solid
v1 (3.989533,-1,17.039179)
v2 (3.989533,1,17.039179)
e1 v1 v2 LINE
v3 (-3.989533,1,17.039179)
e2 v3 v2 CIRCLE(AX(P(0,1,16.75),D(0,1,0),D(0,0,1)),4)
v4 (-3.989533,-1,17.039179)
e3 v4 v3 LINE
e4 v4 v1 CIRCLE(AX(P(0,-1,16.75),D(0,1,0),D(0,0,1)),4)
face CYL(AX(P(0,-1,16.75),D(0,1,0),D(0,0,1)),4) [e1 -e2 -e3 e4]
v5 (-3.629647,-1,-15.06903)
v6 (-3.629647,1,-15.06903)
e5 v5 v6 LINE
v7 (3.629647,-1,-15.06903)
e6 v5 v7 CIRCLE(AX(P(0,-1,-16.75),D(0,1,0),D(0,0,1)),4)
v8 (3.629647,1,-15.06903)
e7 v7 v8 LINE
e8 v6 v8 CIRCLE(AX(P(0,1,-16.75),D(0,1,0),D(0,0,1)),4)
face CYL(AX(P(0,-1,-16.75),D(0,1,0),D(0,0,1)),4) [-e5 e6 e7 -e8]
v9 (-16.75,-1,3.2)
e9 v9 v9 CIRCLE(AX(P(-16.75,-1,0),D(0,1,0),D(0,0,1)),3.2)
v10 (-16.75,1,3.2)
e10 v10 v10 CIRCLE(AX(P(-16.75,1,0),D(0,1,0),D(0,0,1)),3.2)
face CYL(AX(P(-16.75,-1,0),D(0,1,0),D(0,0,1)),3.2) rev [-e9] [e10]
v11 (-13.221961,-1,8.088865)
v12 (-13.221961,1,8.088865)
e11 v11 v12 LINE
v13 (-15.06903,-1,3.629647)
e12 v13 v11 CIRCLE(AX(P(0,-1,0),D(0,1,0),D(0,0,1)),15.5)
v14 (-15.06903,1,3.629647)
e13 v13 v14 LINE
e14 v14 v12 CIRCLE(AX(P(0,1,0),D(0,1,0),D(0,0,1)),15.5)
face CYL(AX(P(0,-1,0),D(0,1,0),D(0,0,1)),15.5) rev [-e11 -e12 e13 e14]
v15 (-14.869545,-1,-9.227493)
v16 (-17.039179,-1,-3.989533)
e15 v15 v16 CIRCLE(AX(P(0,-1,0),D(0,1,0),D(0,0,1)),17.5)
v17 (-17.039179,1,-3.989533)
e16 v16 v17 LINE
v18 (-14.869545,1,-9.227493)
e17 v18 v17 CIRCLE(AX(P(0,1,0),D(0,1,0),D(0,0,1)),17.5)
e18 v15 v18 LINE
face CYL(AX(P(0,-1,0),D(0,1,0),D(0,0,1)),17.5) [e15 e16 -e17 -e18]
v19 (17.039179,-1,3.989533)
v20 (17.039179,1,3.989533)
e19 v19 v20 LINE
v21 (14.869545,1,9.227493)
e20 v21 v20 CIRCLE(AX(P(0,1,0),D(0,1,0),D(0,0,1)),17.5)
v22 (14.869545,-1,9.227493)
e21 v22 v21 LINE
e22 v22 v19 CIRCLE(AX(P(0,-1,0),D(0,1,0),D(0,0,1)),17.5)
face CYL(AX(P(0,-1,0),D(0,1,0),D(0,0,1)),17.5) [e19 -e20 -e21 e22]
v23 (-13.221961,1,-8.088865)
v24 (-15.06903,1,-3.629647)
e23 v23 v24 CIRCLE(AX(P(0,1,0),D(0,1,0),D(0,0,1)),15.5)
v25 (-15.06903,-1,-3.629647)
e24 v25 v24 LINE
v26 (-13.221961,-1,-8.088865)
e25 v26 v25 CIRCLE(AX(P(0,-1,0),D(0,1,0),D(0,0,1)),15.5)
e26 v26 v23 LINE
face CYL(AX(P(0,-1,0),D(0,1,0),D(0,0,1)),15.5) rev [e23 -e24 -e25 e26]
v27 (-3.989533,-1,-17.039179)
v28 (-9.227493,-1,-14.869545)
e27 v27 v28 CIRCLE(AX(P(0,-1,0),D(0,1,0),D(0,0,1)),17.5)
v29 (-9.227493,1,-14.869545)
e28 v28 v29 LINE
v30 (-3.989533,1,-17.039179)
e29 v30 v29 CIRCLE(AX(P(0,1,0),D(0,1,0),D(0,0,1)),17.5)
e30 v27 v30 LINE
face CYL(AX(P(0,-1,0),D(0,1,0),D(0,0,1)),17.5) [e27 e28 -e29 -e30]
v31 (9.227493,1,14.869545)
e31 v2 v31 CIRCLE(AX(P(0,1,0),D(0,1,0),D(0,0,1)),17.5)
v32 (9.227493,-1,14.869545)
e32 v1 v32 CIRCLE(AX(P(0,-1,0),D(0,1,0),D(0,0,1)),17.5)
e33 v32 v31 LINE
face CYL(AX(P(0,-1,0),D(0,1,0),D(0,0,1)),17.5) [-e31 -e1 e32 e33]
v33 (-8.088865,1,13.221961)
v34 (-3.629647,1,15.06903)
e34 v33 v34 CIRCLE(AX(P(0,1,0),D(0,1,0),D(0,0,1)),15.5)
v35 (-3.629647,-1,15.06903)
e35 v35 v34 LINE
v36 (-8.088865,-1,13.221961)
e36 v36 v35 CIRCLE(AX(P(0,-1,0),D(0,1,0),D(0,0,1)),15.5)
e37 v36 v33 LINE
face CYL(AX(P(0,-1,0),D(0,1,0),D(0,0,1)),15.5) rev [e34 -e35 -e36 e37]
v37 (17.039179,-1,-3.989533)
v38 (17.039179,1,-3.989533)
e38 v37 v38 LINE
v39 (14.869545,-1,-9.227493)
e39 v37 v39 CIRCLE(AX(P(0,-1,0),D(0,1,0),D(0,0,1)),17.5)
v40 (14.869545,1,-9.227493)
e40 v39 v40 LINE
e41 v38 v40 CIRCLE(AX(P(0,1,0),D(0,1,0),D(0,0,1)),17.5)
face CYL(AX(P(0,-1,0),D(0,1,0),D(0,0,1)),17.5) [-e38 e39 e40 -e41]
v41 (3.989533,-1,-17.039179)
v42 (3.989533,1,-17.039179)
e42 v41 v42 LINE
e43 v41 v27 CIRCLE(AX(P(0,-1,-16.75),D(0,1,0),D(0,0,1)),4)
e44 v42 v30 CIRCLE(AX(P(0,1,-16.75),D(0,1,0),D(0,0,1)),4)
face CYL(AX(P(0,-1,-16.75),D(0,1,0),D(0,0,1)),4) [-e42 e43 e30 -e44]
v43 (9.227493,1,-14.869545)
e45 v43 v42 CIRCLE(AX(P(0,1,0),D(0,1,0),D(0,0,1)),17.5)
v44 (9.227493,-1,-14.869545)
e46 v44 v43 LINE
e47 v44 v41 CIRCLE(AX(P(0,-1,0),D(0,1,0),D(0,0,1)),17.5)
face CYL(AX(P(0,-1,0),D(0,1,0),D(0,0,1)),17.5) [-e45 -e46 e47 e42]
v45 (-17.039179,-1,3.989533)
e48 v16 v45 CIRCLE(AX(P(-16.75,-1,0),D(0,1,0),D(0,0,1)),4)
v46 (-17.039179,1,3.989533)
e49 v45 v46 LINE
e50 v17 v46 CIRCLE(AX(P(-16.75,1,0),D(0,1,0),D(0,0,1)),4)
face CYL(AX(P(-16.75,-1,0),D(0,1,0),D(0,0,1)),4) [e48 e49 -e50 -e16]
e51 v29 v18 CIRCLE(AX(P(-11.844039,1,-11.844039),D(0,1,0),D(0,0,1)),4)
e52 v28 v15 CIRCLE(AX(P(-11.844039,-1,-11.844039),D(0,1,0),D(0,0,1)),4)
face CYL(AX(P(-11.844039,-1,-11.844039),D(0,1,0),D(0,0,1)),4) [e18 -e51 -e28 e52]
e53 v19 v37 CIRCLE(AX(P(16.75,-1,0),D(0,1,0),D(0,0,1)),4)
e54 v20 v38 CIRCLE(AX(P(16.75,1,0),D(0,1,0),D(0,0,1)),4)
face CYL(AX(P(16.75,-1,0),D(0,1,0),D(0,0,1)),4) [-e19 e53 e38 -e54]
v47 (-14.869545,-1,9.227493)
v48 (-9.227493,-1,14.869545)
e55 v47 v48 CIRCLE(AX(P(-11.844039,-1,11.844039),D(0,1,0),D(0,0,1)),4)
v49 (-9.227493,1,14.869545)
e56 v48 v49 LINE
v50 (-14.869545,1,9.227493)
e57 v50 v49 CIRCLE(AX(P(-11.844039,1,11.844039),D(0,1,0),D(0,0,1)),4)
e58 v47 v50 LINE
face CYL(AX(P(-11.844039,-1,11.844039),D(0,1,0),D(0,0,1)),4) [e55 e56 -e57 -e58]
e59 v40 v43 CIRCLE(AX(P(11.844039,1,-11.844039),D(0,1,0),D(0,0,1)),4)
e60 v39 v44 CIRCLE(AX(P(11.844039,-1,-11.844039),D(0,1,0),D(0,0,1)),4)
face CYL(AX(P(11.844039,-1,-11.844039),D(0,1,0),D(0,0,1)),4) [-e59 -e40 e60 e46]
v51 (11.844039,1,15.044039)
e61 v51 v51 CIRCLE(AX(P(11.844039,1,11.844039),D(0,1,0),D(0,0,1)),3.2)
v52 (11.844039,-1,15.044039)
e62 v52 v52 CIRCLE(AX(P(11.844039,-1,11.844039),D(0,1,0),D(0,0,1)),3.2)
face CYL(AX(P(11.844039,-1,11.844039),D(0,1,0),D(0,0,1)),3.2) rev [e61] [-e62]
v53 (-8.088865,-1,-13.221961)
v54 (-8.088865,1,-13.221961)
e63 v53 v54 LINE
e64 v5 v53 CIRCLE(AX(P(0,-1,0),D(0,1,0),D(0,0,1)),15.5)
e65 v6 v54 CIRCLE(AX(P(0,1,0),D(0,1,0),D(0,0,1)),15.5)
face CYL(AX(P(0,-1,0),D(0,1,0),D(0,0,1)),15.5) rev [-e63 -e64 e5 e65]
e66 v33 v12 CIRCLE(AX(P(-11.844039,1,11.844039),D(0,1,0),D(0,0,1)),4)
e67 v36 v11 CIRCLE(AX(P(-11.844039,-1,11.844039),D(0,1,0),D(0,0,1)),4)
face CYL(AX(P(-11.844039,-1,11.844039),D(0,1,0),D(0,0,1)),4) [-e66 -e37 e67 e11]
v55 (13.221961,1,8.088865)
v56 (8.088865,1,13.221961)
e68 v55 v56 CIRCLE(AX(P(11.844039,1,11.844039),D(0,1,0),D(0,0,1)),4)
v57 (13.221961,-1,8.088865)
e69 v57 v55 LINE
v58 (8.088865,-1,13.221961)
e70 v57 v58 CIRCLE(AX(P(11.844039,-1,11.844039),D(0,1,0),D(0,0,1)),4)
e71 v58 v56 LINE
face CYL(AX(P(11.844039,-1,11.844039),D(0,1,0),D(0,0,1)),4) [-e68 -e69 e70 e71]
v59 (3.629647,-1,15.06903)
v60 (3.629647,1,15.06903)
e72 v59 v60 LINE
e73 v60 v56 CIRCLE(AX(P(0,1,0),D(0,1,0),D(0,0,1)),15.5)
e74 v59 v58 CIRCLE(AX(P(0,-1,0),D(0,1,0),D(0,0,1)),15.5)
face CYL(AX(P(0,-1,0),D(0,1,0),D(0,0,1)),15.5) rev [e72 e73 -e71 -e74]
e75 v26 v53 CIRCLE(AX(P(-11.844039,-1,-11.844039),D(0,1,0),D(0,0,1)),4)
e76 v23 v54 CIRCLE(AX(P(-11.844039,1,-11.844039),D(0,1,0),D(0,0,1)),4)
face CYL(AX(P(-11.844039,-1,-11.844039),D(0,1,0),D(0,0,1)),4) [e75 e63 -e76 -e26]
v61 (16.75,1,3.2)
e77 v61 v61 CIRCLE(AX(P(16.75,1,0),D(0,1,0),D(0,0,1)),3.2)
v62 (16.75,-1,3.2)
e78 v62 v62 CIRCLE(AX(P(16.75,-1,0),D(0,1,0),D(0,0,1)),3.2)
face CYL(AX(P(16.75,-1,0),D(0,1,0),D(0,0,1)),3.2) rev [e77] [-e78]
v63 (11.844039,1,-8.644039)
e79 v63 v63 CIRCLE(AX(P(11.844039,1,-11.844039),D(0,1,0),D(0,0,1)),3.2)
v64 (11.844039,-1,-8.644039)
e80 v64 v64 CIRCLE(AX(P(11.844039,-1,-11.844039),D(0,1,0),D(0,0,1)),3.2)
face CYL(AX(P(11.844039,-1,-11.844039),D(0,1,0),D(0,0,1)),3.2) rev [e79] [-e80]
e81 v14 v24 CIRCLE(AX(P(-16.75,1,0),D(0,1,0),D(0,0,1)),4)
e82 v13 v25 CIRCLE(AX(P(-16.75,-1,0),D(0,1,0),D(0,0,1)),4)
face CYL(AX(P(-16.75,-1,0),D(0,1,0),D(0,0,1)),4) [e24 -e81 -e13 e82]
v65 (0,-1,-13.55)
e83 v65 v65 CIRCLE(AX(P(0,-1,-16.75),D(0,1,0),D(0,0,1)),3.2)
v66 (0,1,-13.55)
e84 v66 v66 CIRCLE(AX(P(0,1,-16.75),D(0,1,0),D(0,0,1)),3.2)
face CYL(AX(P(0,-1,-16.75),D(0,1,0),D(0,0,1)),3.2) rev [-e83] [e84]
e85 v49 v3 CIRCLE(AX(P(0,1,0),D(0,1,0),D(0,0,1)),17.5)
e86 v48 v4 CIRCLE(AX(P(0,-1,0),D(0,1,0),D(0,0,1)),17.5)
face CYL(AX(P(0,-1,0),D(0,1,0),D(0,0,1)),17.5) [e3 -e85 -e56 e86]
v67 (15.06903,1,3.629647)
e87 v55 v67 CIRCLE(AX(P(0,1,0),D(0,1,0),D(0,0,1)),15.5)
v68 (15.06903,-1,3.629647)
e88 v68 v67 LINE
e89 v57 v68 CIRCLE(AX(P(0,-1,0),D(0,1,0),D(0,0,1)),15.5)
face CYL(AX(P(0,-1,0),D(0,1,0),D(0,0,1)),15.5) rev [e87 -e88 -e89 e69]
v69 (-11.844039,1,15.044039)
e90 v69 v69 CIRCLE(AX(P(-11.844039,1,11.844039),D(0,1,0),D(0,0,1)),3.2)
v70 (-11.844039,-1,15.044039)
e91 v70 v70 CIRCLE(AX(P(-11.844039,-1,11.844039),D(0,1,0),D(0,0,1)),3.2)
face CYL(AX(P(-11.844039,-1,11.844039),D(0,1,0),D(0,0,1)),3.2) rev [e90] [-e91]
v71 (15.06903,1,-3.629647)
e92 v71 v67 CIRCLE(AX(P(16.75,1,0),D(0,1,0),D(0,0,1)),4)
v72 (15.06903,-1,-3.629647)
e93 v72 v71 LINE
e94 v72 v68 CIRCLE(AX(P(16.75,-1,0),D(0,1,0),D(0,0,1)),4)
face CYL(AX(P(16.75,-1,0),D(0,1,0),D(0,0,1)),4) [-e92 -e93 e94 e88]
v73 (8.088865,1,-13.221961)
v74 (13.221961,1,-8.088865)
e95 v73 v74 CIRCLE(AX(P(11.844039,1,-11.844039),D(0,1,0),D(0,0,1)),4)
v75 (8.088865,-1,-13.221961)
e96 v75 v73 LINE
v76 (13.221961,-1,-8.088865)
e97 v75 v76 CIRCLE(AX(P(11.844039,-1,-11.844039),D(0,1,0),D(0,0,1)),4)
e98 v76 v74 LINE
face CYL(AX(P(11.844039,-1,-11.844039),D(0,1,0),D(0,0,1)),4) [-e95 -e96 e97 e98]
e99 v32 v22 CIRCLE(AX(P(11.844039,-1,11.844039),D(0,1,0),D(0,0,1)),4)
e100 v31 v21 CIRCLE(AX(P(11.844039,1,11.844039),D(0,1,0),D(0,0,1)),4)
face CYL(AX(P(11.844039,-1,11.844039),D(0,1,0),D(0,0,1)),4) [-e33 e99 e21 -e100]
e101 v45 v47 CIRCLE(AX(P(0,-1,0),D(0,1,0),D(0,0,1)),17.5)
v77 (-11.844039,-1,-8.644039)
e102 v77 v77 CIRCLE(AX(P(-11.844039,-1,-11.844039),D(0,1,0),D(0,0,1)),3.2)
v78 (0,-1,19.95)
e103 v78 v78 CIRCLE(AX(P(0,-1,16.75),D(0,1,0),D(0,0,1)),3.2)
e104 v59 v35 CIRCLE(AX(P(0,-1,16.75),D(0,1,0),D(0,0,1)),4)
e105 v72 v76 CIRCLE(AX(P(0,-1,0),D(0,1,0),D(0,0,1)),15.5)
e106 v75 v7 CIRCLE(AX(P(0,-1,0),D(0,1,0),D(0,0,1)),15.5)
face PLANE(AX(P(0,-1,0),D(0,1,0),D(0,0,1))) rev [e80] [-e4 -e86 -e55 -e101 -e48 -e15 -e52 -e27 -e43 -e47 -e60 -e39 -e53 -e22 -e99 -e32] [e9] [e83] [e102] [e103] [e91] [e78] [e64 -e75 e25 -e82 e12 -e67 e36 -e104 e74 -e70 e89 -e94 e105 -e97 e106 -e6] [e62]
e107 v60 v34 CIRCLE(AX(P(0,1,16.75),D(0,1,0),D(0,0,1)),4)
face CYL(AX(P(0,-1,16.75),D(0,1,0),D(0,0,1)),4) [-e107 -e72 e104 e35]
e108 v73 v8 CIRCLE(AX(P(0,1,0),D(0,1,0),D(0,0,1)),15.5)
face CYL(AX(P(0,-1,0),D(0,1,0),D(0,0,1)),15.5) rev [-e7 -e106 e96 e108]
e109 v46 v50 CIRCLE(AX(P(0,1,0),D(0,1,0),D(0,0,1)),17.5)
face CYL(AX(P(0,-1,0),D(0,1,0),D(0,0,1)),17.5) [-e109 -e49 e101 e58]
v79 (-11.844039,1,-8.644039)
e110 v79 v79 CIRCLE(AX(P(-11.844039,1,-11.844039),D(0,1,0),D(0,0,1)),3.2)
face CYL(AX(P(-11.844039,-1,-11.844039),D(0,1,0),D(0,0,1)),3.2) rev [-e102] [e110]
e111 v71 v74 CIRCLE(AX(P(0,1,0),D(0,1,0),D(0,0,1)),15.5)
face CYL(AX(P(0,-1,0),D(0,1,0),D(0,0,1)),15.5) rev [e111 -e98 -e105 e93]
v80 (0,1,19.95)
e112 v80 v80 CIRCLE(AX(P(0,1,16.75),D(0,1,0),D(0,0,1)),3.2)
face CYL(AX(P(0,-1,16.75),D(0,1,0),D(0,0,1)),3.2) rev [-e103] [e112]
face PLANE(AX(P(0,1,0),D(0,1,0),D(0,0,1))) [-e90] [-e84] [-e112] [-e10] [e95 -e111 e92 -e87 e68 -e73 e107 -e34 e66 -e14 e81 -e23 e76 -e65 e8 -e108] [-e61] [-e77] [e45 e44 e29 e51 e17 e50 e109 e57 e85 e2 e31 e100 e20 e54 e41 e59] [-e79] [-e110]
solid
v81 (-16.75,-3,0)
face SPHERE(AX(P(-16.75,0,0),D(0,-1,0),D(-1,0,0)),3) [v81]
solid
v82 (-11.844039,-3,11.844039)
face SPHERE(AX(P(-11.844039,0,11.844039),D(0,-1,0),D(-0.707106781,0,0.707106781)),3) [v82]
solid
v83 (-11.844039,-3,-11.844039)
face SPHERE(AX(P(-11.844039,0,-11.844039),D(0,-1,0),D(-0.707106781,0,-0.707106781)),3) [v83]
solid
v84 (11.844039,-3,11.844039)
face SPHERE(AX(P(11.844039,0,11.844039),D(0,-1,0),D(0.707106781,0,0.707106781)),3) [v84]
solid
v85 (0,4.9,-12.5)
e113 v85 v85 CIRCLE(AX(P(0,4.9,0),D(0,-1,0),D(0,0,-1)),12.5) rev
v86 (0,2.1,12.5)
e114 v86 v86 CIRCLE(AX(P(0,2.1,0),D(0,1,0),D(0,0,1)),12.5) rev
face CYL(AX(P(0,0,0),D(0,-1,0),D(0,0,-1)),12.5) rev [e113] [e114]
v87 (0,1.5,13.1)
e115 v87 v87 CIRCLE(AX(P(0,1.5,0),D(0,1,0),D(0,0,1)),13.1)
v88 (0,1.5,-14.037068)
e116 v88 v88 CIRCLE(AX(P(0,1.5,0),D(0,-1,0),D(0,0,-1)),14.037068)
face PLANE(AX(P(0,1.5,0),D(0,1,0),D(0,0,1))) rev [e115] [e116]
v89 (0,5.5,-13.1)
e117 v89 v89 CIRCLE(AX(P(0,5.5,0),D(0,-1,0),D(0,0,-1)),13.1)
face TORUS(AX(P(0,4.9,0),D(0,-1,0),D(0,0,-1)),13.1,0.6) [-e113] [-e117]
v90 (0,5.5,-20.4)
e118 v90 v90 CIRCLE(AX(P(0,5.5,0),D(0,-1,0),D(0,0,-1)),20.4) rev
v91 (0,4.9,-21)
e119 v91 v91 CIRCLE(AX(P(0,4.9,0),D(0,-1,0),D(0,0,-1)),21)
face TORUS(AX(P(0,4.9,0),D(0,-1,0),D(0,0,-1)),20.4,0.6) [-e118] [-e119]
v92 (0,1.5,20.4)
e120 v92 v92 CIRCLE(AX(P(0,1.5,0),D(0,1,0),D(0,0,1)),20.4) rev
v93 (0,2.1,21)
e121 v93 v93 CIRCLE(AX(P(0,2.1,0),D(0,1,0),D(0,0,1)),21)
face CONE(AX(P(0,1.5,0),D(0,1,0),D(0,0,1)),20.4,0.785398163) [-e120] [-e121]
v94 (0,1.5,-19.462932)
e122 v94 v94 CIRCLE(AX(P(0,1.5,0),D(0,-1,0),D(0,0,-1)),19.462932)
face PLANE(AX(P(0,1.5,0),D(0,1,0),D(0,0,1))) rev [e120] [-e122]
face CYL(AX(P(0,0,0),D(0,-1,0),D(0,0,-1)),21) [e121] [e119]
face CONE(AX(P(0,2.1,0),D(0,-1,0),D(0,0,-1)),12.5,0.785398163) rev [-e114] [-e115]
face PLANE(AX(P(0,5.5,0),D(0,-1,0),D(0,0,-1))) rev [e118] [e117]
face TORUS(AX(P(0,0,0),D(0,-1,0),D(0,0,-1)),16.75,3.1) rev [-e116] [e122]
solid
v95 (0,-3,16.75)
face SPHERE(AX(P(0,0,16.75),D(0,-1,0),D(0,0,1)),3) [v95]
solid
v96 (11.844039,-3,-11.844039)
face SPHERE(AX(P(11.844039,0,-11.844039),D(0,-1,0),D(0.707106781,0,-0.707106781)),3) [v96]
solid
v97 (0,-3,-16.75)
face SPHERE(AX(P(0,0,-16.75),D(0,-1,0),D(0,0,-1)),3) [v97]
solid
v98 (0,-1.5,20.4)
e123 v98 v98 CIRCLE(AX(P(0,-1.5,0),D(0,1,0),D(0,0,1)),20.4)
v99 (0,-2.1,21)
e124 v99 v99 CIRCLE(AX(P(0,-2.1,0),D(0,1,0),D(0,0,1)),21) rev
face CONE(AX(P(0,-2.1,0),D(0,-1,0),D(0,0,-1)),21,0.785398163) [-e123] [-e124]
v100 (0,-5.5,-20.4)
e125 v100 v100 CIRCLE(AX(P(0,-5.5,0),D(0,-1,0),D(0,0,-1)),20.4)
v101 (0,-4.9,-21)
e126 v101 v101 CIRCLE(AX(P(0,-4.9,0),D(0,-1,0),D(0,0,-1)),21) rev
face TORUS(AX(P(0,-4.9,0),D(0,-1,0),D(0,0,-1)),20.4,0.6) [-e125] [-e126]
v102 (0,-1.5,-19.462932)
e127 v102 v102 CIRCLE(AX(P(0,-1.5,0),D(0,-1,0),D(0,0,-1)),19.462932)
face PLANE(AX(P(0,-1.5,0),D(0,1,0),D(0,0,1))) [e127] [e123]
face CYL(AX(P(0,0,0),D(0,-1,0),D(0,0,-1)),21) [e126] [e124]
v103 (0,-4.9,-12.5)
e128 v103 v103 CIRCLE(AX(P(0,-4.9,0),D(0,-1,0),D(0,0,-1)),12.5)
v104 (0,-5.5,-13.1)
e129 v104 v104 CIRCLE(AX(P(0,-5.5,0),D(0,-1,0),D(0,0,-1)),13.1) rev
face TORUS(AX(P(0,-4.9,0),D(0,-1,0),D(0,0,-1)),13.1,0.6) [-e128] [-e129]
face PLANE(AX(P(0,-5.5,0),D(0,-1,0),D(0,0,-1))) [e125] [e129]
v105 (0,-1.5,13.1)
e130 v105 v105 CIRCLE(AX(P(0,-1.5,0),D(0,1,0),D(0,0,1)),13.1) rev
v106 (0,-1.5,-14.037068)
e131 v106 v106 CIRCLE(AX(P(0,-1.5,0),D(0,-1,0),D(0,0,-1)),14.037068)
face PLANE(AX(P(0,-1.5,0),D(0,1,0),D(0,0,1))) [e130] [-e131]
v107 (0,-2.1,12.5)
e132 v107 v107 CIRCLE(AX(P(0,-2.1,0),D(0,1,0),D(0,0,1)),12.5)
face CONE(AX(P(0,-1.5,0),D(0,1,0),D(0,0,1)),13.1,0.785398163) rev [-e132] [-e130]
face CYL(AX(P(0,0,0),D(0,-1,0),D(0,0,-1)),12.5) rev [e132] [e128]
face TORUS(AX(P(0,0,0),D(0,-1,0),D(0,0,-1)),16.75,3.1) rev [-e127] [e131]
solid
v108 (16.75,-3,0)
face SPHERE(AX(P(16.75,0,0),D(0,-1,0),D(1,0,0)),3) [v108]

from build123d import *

# Parameters (mm, degrees)
CIRPATTERN2_COUNT        = 8
FILLET1_R                = 0.6
CHAMFER1_SIZE            = 0.6
FILLET2_R                = 0.6
CHAMFER2_SIZE            = 0.6
BOSS_EXTRUDE1_DEPTH      = 1
BOSS_EXTRUDE1_DEPTH_BACK = 1
SKETCH4_R                = 3.2


with BuildPart() as part:
    # Sketch1 → Revolve4 (revolve)
    with BuildSketch(Plane(origin=(0, 0, 0), x_dir=(0, 0, -1), z_dir=(1, 0, 0))):
        with BuildLine():
            Line((-16.75, 3), (-16.75, -3))
            ThreePointArc((-16.75, -3), (-19.75, 0), (-16.75, 3))
        make_face()
    revolve(axis=Axis((0, 0, 16.75), (0, 1, 0)))


with BuildPart() as body_2:
    # Sketch3 → Revolve5 (revolve)
    with BuildSketch(Plane(origin=(0, 0, 0), x_dir=(0, 0, -1), z_dir=(1, 0, 0))):
        with BuildLine():
            Line((-12.5, 5.5), (-21, 5.5))
            Line((-21, 5.5), (-21, 1.5))
            Line((-21, 1.5), (-19.462931993, 1.5))
            ThreePointArc((-19.462931993, 1.5), (-16.75, 3.1), (-14.037068007, 1.5))
            Line((-14.037068007, 1.5), (-12.5, 1.5))
            Line((-12.5, 1.5), (-12.5, 5.5))
        make_face()
        with BuildLine():
            ThreePointArc((-14.037068007, -1.5), (-16.75, -3.1), (-19.462931993, -1.5))
            Line((-19.462931993, -1.5), (-21, -1.5))
            Line((-21, -1.5), (-21, -5.5))
            Line((-21, -5.5), (-12.5, -5.5))
            Line((-12.5, -5.5), (-12.5, -1.5))
            Line((-12.5, -1.5), (-14.037068007, -1.5))
        make_face()
    revolve(axis=Axis((0, 0, 0), (0, 1, 0)))

    # Fillet1
    fillet1_edges = [body_2.edges().sort_by_distance(p)[0] for p in [
        (0, 5.5, -12.5),
        (0, 5.5, -21),
    ]]
    fillet(fillet1_edges, radius=FILLET1_R)

    # Chamfer1
    chamfer1_edges = [body_2.edges().sort_by_distance(p)[0] for p in [
        (0, -1.5, -12.5),
        (0, -1.5, -21),
    ]]
    chamfer(chamfer1_edges, length=CHAMFER1_SIZE)

    # Fillet2
    fillet2_edges = [body_2.edges().sort_by_distance(p)[0] for p in [
        (0, -5.5, -12.5),
        (0, -5.5, -21),
    ]]
    fillet(fillet2_edges, radius=FILLET2_R)

    # Chamfer2
    chamfer2_edges = [body_2.edges().sort_by_distance(p)[0] for p in [
        (0, 1.5, -12.5),
        (0, 1.5, -21),
    ]]
    chamfer(chamfer2_edges, length=CHAMFER2_SIZE)


with BuildPart() as cirpattern2_1:
    # CirPattern2: pattern copy
    add(part.part.rotate(Axis((0, 5.5, 0), (0, -1, 0)), 1 * 360 / CIRPATTERN2_COUNT))


with BuildPart() as cirpattern2_2:
    # CirPattern2: pattern copy
    add(part.part.rotate(Axis((0, 5.5, 0), (0, -1, 0)), 2 * 360 / CIRPATTERN2_COUNT))


with BuildPart() as cirpattern2_3:
    # CirPattern2: pattern copy
    add(part.part.rotate(Axis((0, 5.5, 0), (0, -1, 0)), 3 * 360 / CIRPATTERN2_COUNT))


with BuildPart() as cirpattern2_4:
    # CirPattern2: pattern copy
    add(part.part.rotate(Axis((0, 5.5, 0), (0, -1, 0)), 4 * 360 / CIRPATTERN2_COUNT))


with BuildPart() as cirpattern2_5:
    # CirPattern2: pattern copy
    add(part.part.rotate(Axis((0, 5.5, 0), (0, -1, 0)), 5 * 360 / CIRPATTERN2_COUNT))


with BuildPart() as cirpattern2_6:
    # CirPattern2: pattern copy
    add(part.part.rotate(Axis((0, 5.5, 0), (0, -1, 0)), 6 * 360 / CIRPATTERN2_COUNT))


with BuildPart() as cirpattern2_7:
    # CirPattern2: pattern copy
    add(part.part.rotate(Axis((0, 5.5, 0), (0, -1, 0)), 7 * 360 / CIRPATTERN2_COUNT))


with BuildPart() as body_10:
    # Sketch4 → Boss-Extrude1 (new, two sides: drawn at the far end of the back side and taken through both)
    with BuildSketch(Plane(origin=(0, 0, 0), x_dir=(1, 0, 0), z_dir=(0, 1, 0)).offset(-BOSS_EXTRUDE1_DEPTH_BACK)):
        with BuildLine():
            ThreePointArc((-17.039179104, -3.989533237), (-16.167891819, -6.696960066), (-14.869545096, -9.227493085))
            ThreePointArc((-14.869545096, -9.227493085), (-14.67246571, -14.67246571), (-9.227493085, -14.869545096))
            ThreePointArc((-9.227493085, -14.869545096), (-6.696960066, -16.167891819), (-3.989533237, -17.039179104))
            ThreePointArc((-3.989533237, -17.039179104), (0, -20.75), (3.989533237, -17.039179104))
            ThreePointArc((3.989533237, -17.039179104), (6.696960066, -16.167891819), (9.227493085, -14.869545096))
            ThreePointArc((9.227493085, -14.869545096), (14.67246571, -14.67246571), (14.869545096, -9.227493085))
            ThreePointArc((14.869545096, -9.227493085), (16.167891819, -6.696960066), (17.039179104, -3.989533237))
            ThreePointArc((17.039179104, -3.989533237), (20.75, 0), (17.039179104, 3.989533237))
            ThreePointArc((17.039179104, 3.989533237), (16.167891819, 6.696960066), (14.869545096, 9.227493085))
            ThreePointArc((14.869545096, 9.227493085), (14.67246571, 14.67246571), (9.227493085, 14.869545096))
            ThreePointArc((9.227493085, 14.869545096), (6.696960066, 16.167891819), (3.989533237, 17.039179104))
            ThreePointArc((3.989533237, 17.039179104), (0, 20.75), (-3.989533237, 17.039179104))
            ThreePointArc((-3.989533237, 17.039179104), (-6.696960066, 16.167891819), (-9.227493085, 14.869545096))
            ThreePointArc((-9.227493085, 14.869545096), (-14.67246571, 14.67246571), (-14.869545096, 9.227493085))
            ThreePointArc((-14.869545096, 9.227493085), (-16.167891819, 6.696960066), (-17.039179104, 3.989533237))
            ThreePointArc((-17.039179104, 3.989533237), (-20.75, 0), (-17.039179104, -3.989533237))
        make_face()
        with BuildLine():
            ThreePointArc((-15.069029851, -3.629647277), (-12.75, 0), (-15.069029851, 3.629647277))
            ThreePointArc((-15.069029851, 3.629647277), (-14.320132754, 5.931593202), (-13.221961396, 8.08886499))
            ThreePointArc((-13.221961396, 8.08886499), (-9.01561146, 9.01561146), (-8.08886499, 13.221961396))
            ThreePointArc((-8.08886499, 13.221961396), (-5.931593202, 14.320132754), (-3.629647277, 15.069029851))
            ThreePointArc((-3.629647277, 15.069029851), (0, 12.75), (3.629647277, 15.069029851))
            ThreePointArc((3.629647277, 15.069029851), (5.931593202, 14.320132754), (8.08886499, 13.221961396))
            ThreePointArc((8.08886499, 13.221961396), (9.01561146, 9.01561146), (13.221961396, 8.08886499))
            ThreePointArc((13.221961396, 8.08886499), (14.320132754, 5.931593202), (15.069029851, 3.629647277))
            ThreePointArc((15.069029851, 3.629647277), (12.75, 0), (15.069029851, -3.629647277))
            ThreePointArc((15.069029851, -3.629647277), (14.320132754, -5.931593202), (13.221961396, -8.08886499))
            ThreePointArc((13.221961396, -8.08886499), (9.01561146, -9.01561146), (8.08886499, -13.221961396))
            ThreePointArc((8.08886499, -13.221961396), (5.931593202, -14.320132754), (3.629647277, -15.069029851))
            ThreePointArc((3.629647277, -15.069029851), (0, -12.75), (-3.629647277, -15.069029851))
            ThreePointArc((-3.629647277, -15.069029851), (-5.931593202, -14.320132754), (-8.08886499, -13.221961396))
            ThreePointArc((-8.08886499, -13.221961396), (-9.01561146, -9.01561146), (-13.221961396, -8.08886499))
            ThreePointArc((-13.221961396, -8.08886499), (-14.320132754, -5.931593202), (-15.069029851, -3.629647277))
        make_face(mode=Mode.SUBTRACT)
        with Locations((-16.75, 0)):
            Circle(SKETCH4_R, mode=Mode.SUBTRACT)
        with Locations((-11.844038585, -11.844038585)):
            Circle(SKETCH4_R, mode=Mode.SUBTRACT)
        with Locations((-11.844038585, 11.844038585)):
            Circle(SKETCH4_R, mode=Mode.SUBTRACT)
        with Locations((0, -16.75)):
            Circle(SKETCH4_R, mode=Mode.SUBTRACT)
        with Locations((0, 16.75)):
            Circle(SKETCH4_R, mode=Mode.SUBTRACT)
        with Locations((11.844038585, -11.844038585)):
            Circle(SKETCH4_R, mode=Mode.SUBTRACT)
        with Locations((11.844038585, 11.844038585)):
            Circle(SKETCH4_R, mode=Mode.SUBTRACT)
        with Locations((16.75, 0)):
            Circle(SKETCH4_R, mode=Mode.SUBTRACT)
    extrude(amount=BOSS_EXTRUDE1_DEPTH + BOSS_EXTRUDE1_DEPTH_BACK)


solid = Compound([part.part, body_2.part, cirpattern2_1.part, cirpattern2_2.part, cirpattern2_3.part, cirpattern2_4.part, cirpattern2_5.part, cirpattern2_6.part, cirpattern2_7.part, body_10.part])
